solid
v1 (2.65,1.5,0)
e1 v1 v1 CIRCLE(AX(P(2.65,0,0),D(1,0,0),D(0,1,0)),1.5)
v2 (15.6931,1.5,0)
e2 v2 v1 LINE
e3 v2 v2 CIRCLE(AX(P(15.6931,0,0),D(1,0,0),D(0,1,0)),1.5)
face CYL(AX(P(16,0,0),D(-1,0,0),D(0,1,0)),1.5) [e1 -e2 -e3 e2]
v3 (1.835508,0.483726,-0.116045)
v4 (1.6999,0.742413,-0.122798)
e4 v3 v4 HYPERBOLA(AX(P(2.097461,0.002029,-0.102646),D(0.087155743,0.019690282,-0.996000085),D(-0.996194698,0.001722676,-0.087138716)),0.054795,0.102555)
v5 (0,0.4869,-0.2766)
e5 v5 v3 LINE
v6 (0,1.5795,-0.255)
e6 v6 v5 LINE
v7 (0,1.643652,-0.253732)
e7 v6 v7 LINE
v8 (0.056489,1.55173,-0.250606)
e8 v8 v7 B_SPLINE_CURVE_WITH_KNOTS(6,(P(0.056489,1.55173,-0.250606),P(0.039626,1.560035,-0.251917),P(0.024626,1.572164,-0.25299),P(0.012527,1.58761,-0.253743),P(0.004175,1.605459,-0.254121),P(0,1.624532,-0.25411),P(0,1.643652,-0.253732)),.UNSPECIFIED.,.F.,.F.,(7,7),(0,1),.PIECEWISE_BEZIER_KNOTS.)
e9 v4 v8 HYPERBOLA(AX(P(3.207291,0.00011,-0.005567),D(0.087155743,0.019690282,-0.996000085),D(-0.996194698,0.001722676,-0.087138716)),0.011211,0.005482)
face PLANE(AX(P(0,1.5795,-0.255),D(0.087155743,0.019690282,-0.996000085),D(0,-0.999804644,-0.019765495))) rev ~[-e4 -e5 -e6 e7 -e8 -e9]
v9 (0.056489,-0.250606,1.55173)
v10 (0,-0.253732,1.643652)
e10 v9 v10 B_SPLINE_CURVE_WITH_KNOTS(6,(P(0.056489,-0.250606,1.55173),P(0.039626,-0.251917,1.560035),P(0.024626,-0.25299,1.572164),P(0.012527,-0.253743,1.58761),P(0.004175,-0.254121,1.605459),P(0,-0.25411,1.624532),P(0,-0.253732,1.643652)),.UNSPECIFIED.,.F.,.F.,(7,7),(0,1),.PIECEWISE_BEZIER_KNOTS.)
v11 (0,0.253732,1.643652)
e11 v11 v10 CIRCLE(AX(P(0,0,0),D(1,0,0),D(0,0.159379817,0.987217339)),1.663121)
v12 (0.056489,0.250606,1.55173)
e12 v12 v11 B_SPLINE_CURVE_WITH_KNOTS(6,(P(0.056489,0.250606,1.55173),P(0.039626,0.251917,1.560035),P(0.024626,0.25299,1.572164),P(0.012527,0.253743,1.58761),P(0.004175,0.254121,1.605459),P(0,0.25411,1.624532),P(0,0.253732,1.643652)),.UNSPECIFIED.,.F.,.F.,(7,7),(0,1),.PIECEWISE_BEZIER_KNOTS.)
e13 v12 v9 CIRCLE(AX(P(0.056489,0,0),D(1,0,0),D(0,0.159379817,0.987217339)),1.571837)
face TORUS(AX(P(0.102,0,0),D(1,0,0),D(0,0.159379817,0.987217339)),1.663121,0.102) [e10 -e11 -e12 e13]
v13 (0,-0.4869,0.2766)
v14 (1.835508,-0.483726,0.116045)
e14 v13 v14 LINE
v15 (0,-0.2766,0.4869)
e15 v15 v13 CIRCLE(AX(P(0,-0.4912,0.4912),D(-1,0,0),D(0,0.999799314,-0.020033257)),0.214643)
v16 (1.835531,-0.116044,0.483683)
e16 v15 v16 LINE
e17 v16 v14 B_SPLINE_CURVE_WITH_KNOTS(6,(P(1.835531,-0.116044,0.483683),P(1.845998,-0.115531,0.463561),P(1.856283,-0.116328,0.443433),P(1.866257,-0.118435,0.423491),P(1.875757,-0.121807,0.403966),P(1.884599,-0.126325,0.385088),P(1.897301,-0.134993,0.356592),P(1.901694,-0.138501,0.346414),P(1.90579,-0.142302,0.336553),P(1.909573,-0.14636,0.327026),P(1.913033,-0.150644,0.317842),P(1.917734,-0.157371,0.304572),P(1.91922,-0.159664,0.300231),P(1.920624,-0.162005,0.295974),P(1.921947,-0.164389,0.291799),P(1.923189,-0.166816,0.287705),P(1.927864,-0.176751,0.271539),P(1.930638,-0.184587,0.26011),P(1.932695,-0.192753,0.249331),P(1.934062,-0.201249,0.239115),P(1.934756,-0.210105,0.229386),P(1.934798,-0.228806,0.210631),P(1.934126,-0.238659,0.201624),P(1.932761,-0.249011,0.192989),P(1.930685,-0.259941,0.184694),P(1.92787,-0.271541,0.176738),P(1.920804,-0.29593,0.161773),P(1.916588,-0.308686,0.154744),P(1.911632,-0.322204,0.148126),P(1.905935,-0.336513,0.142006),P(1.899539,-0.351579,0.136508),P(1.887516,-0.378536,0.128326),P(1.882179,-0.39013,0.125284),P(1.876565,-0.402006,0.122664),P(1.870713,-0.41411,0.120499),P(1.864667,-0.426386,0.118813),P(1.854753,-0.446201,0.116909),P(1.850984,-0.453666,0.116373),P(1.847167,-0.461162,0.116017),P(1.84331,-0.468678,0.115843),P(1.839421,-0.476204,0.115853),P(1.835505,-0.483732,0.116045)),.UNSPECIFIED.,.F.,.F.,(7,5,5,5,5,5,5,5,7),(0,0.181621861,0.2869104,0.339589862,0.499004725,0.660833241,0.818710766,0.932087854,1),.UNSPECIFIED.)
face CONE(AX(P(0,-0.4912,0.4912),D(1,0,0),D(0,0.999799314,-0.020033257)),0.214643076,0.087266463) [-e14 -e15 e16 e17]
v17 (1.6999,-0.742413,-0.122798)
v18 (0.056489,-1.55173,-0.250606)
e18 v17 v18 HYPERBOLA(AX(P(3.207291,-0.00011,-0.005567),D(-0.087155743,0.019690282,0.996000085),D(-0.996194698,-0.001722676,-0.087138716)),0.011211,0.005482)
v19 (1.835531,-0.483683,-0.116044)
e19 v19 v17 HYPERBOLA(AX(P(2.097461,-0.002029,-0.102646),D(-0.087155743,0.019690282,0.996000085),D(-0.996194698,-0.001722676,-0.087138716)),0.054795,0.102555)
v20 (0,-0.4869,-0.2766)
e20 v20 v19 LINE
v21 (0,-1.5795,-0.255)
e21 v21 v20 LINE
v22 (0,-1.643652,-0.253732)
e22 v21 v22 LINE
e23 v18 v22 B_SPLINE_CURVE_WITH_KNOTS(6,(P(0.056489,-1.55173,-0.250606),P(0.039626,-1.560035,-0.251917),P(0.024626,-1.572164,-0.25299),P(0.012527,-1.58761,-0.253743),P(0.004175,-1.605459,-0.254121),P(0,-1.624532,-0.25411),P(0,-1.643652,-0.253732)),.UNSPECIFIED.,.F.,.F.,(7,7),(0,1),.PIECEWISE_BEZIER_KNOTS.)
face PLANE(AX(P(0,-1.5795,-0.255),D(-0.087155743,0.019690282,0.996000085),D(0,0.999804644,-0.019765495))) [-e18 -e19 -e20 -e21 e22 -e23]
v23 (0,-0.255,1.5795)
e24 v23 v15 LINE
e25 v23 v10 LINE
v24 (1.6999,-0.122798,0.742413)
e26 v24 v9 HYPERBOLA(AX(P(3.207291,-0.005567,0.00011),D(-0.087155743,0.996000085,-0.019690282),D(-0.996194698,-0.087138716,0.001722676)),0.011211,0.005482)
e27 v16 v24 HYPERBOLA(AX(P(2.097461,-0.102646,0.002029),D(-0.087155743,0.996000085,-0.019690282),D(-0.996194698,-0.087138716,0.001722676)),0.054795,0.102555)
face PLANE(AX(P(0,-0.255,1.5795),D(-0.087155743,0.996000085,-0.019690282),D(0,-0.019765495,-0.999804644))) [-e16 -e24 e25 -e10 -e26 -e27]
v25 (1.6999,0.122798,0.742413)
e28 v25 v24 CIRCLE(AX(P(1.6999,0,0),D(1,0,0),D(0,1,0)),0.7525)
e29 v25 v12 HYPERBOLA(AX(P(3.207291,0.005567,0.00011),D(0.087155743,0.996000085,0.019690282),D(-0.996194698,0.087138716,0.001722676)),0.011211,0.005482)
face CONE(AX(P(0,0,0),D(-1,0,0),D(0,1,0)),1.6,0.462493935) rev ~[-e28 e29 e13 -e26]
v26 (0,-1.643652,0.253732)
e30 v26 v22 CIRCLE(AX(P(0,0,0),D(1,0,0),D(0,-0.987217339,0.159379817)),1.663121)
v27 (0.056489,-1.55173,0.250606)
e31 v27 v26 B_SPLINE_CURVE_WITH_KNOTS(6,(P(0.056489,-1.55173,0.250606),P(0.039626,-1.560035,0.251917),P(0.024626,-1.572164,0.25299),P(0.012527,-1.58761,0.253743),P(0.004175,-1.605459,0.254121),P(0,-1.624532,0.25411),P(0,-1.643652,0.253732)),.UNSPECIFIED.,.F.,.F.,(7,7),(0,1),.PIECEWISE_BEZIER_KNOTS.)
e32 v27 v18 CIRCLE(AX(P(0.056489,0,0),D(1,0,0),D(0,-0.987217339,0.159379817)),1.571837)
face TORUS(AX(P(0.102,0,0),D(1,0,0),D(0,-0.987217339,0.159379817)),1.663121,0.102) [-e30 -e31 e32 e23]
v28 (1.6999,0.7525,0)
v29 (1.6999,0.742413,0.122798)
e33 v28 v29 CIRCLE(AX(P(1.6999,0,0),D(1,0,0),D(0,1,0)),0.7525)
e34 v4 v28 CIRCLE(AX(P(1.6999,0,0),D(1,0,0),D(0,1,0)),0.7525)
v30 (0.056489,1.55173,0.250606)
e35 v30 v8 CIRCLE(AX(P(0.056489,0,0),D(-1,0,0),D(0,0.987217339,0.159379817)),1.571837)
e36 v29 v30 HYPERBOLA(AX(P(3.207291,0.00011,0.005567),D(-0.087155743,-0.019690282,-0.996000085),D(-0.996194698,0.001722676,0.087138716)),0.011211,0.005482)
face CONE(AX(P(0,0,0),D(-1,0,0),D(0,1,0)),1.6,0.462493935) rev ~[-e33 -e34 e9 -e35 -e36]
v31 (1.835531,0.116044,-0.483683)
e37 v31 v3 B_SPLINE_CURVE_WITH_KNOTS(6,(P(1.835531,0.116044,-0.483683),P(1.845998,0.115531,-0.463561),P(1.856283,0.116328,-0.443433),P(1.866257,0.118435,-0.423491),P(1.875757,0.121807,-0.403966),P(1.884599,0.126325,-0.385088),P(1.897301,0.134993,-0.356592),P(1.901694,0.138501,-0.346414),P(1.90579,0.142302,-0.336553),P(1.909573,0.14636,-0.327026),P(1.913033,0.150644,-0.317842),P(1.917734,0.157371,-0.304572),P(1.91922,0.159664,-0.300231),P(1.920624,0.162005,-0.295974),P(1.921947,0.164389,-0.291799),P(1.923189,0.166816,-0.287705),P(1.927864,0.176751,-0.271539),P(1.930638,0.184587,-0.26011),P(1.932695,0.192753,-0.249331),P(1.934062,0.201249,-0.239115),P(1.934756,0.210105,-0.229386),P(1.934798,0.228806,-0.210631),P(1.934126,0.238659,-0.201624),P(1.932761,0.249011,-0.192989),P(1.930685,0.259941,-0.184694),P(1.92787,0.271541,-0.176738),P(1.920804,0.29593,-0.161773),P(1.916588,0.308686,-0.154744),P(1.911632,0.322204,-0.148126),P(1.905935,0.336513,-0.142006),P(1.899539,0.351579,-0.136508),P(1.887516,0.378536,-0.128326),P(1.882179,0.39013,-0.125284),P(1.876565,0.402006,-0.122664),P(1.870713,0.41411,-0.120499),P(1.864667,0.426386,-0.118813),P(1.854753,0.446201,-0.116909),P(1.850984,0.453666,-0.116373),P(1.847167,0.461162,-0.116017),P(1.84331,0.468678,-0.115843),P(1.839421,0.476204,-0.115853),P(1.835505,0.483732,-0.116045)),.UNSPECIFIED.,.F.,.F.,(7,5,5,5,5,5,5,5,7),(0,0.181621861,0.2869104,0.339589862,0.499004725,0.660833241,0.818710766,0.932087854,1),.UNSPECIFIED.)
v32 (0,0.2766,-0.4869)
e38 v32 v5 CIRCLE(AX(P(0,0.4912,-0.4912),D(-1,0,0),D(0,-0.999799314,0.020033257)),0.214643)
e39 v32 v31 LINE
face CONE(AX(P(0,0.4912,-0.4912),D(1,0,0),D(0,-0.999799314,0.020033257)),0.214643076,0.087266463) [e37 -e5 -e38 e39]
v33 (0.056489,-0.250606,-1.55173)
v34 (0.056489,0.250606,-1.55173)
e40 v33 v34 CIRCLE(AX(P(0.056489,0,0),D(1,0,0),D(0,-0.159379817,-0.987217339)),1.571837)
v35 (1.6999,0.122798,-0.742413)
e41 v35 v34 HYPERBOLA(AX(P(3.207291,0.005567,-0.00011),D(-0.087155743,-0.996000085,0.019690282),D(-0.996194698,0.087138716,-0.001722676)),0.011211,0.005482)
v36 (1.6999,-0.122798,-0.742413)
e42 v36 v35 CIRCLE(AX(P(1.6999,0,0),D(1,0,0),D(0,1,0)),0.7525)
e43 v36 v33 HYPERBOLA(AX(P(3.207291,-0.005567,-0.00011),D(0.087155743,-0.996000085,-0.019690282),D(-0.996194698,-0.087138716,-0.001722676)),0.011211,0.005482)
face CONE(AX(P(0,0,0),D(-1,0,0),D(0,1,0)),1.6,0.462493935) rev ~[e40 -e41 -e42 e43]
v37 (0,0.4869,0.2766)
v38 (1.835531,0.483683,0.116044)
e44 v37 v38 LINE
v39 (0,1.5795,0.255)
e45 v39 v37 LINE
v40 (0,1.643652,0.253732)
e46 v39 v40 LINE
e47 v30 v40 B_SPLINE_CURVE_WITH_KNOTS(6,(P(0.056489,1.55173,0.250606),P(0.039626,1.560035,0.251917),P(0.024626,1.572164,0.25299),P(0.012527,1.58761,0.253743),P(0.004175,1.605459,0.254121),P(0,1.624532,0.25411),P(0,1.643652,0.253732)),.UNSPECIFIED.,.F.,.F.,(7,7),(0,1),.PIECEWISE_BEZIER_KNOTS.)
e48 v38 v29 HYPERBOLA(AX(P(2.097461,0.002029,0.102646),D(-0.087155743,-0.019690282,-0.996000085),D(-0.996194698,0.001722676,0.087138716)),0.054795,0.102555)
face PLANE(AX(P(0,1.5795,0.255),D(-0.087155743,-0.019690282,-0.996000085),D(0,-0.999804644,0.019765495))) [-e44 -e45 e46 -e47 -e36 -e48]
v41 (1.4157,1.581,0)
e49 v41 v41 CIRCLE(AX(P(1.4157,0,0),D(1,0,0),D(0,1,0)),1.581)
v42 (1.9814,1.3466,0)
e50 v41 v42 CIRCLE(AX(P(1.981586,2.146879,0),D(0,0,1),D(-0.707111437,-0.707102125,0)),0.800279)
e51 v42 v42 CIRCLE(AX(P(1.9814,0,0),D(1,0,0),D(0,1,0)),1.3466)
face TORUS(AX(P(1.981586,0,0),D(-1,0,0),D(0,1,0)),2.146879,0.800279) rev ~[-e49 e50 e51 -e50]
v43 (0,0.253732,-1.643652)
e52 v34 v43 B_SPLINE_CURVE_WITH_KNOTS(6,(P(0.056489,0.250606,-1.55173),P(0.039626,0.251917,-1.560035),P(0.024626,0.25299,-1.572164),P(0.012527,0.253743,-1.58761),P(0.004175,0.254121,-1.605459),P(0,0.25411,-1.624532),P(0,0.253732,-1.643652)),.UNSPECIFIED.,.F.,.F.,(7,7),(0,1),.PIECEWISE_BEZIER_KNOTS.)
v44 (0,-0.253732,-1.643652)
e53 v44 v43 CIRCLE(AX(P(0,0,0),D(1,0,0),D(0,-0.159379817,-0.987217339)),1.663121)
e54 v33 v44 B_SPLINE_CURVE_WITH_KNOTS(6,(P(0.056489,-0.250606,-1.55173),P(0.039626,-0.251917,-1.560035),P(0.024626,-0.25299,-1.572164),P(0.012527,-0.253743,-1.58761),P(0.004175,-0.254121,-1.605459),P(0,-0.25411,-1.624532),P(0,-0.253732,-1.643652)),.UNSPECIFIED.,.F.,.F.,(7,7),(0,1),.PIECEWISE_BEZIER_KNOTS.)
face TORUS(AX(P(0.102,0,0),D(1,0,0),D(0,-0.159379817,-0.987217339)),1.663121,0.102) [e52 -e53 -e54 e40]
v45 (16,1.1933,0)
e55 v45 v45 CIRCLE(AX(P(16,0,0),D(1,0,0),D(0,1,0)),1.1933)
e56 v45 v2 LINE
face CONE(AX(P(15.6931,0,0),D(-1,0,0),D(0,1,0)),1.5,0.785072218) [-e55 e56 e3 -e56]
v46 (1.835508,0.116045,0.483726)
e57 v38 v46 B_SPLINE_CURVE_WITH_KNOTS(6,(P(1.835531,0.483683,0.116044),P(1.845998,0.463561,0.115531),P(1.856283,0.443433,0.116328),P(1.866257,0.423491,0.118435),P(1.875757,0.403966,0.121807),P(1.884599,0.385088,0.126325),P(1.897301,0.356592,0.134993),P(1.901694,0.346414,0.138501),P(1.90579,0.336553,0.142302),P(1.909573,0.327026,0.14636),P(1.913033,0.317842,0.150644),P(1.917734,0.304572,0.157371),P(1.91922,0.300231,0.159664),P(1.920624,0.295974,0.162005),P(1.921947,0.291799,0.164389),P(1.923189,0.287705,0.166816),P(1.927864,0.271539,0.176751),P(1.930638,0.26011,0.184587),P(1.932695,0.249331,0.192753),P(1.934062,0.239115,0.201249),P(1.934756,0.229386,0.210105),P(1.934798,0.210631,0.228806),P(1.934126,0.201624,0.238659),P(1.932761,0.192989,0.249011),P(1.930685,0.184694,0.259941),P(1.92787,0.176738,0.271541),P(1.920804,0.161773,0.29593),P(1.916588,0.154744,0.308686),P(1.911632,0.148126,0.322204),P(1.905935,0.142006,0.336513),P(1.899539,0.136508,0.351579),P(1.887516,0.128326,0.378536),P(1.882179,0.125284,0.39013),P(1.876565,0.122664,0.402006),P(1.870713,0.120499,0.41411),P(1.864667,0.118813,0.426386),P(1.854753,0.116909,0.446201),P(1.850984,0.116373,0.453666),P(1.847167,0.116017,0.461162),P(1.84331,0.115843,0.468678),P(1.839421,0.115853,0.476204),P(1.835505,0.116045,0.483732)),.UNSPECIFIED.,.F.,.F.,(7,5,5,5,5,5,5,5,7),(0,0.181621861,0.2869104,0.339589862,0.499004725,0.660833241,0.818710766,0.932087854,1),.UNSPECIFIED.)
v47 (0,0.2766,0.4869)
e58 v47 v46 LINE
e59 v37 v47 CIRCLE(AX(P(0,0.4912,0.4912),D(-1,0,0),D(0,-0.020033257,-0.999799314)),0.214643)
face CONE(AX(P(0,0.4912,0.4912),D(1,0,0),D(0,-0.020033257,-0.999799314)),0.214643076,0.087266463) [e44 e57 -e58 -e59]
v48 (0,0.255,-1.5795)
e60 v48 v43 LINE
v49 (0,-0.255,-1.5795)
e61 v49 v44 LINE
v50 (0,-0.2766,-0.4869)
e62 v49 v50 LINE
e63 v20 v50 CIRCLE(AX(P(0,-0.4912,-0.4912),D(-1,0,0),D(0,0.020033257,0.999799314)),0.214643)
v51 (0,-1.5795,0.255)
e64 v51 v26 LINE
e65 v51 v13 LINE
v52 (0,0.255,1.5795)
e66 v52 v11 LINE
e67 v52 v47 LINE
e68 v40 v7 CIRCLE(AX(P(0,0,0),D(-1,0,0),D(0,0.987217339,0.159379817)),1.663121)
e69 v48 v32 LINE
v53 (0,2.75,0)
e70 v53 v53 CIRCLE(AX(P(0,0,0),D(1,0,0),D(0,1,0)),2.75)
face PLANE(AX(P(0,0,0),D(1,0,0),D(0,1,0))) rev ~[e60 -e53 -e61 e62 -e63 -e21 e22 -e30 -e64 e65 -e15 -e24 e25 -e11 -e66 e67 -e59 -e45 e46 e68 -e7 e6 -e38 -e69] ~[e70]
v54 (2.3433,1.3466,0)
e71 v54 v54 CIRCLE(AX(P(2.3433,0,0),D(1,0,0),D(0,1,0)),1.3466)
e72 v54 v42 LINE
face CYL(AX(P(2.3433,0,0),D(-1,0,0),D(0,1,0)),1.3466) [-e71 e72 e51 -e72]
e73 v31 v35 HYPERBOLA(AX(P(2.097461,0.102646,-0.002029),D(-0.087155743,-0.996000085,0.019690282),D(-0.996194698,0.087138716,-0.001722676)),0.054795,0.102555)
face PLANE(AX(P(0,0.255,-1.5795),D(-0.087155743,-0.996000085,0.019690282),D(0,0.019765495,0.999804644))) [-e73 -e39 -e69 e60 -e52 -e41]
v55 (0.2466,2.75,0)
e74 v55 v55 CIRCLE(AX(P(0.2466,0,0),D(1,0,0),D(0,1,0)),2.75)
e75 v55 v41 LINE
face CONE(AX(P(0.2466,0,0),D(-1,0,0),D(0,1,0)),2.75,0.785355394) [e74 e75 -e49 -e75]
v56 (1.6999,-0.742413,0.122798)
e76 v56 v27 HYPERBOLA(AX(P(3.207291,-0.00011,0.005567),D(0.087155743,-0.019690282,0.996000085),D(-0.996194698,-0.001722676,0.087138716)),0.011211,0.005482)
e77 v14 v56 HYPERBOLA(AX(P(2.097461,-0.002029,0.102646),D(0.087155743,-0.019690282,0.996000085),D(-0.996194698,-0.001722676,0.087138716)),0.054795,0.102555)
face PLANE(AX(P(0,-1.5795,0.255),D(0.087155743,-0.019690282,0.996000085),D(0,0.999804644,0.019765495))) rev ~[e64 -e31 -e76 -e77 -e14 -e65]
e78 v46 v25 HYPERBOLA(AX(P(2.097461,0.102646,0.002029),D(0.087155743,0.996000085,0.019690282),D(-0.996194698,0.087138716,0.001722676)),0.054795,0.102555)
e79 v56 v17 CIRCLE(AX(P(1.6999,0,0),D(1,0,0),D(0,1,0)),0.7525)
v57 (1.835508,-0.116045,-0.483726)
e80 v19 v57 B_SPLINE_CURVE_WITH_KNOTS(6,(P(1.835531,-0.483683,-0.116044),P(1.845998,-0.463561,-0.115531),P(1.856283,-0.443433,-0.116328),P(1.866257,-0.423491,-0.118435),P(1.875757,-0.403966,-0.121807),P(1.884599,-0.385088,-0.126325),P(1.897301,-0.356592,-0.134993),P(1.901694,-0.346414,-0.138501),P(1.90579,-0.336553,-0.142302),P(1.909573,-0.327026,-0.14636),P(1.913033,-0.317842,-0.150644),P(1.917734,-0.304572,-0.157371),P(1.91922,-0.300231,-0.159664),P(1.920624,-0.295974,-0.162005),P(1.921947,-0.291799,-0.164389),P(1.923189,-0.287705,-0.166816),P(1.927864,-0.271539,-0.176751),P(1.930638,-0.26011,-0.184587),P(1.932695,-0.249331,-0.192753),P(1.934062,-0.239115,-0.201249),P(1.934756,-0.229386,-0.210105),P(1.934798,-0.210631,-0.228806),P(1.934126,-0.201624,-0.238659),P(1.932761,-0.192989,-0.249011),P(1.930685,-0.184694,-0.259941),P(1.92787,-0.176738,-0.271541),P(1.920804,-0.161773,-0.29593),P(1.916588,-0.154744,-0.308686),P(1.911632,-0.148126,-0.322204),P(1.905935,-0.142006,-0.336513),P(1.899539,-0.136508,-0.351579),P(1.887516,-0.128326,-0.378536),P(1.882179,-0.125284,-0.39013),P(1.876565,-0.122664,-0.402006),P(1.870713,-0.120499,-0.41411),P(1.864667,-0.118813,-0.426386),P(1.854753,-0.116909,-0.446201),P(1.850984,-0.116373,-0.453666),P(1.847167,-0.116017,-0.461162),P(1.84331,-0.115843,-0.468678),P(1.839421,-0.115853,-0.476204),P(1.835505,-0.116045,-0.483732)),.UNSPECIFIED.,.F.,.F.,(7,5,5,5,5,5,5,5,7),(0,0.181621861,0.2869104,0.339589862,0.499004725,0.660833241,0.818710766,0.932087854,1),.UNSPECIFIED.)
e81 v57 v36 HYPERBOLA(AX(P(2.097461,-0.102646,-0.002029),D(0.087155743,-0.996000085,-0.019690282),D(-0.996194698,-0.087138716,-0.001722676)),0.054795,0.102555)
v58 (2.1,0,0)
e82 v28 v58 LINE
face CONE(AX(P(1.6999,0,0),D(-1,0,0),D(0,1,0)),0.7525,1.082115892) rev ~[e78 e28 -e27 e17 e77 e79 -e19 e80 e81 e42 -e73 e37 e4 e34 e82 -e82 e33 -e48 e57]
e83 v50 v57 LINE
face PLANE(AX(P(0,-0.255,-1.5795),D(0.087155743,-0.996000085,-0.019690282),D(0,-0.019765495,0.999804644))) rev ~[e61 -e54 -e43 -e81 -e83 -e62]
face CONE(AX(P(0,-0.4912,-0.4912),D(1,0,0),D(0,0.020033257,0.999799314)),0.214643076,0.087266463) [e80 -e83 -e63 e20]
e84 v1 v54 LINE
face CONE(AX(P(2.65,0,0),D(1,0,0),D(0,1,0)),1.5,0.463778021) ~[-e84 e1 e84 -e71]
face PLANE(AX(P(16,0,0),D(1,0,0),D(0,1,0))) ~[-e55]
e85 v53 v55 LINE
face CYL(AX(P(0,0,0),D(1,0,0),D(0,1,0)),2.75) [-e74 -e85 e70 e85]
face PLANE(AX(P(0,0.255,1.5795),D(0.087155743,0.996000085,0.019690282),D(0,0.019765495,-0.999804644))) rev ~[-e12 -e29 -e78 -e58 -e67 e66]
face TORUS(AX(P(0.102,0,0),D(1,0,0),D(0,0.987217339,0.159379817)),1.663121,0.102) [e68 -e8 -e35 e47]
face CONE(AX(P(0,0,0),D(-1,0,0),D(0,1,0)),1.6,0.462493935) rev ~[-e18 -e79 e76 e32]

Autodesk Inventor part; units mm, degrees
ref_plane "YZ Plane" through (0, 0, 0) normal (1, 0, 0) x (0, 1, 0)
ref_plane "XZ Plane" through (0, 0, 0) normal (0, 1, 0) x (-1, 0, 0)
sketch "Sketch1" plane through (0, 0, 0) normal (0, 0, 1) x (1, 0, 0)
  line L0 (2.1, 0) -> (16, 0)
  line L1 (16, 0) -> (16, 1.5)
  line L2 (16, 1.5) -> (2.65, 1.5)
  line L3 (2.65, 1.5) -> (2.3433, 1.3466)
  line L4 (2.3433, 1.3466) -> (1.9814, 1.3466)
  line L5 (0, 2.75) -> (0, 1.6)
  line L6 (0, 1.6) -> (1.6999, 0.7525)
  line L7 (1.6999, 0.7525) -> (2.1, 0)
  line L8 (-3.2, 0) -> (19.2, 0) projected
  line L9 (0, -0.55) -> (0, 3.3) projected
  line L10 (0, 2.75) -> (0.2466, 2.75)
  line L11 (0.2466, 2.75) -> (1.4157, 1.581)
  line L12 (2.65, 1.5) -> (1.4966, 1.5) construction
  arc A0 (1.4157, 1.581) -> (1.9814, 1.3466) centre (1.9814, 2.1466) ccw
  point P0 (1.65, 1.3466)
  dimension "d1" = 13.35
  dimension "d2" = 3
  dimension "d3" = 2.6933
  dimension "d4" = 3.2
  dimension "d5" = 26.5
  dimension "d6" = 62
  dimension "d7" = 2.1
  dimension "d8" = 0.3067
  dimension "d12" = 5.5
  dimension "d13" = 45
  dimension "d15" = 16
  dimension "d24" = 1.65
  dimension "d93" = 0.8
revolve "Body" add sketch "Sketch1" angle 360 about axis through (2.1, 0, 0) along (1, 0, 0) contours L7 L6 L5 L10 L11 A0 L4 L3 L2 L1 L0
sketch "Sketch2" plane through (0, 0, 0) normal (-1, 0, 0) x (0, 0, 1)
  line L0 (0, 1.6) -> (0, 0) construction
  line L1 (0, 0) -> (1.6, 0) construction
  arc A0 (0.48, 0) -> (0, 0.48) centre (0, 0) ccw construction
  arc A1 (0.56, 0) -> (0, 0.56) centre (0, 0) ccw construction
  arc A2 (1.5795, 0.255) -> (0.255, 1.5795) centre (0, 0) ccw
  line L2 (0, 0) -> (1.1314, 1.1314) construction
  line L3 (0.255, 1.5795) -> (0.2766, 0.4869)
  line L4 (1.5795, 0.255) -> (0.4869, 0.2766)
  arc A3 (0.255, 1.5795) -> (0, 1.6) centre (0, 0) ccw
  arc A4 (1.6, 0) -> (1.5795, 0.255) centre (0, 0) ccw
  line L5 (0, -3.85) -> (0, 3.85) projected
  line L6 (-3.85, 0) -> (3.85, 0) projected
  arc A5 (0.255, -1.5795) -> (1.5795, -0.255) centre (0, 0) ccw
  line L7 (0.255, -1.5795) -> (0.2766, -0.4869)
  line L8 (1.5795, -0.255) -> (0.4869, -0.2766)
  arc A6 (0, -1.6) -> (0.255, -1.5795) centre (0, 0) ccw
  arc A7 (1.5795, -0.255) -> (1.6, 0) centre (0, 0) ccw
  arc A8 (-0.255, 1.5795) -> (-1.5795, 0.255) centre (0, 0) ccw
  line L9 (-0.255, 1.5795) -> (-0.2766, 0.4869)
  line L10 (-1.5795, 0.255) -> (-0.4869, 0.2766)
  arc A9 (0, 1.6) -> (-0.255, 1.5795) centre (0, 0) ccw
  arc A10 (-1.5795, 0.255) -> (-1.6, 0) centre (0, 0) ccw
  arc A11 (-0.255, -1.5795) -> (0, -1.6) centre (0, 0) ccw
  arc A12 (-1.5795, -0.255) -> (-0.255, -1.5795) centre (0, 0) ccw
  arc A13 (-1.6, 0) -> (-1.5795, -0.255) centre (0, 0) ccw
  line L11 (-1.5795, -0.255) -> (-0.4869, -0.2766)
  line L12 (-0.255, -1.5795) -> (-0.2766, -0.4869)
  arc A14 (0.2766, 0.4869) -> (0.4869, 0.2766) centre (0.4912, 0.4912) ccw
  arc A15 (0.4869, -0.2766) -> (0.2766, -0.4869) centre (0.4912, -0.4912) ccw
  arc A16 (-0.4869, 0.2766) -> (-0.2766, 0.4869) centre (-0.4912, 0.4912) ccw
  arc A17 (-0.2766, -0.4869) -> (-0.4869, -0.2766) centre (-0.4912, -0.4912) ccw
  point P0 (1.1314, -1.1314)
  point P1 (-1.1314, 1.1314)
  point P2 (-1.1314, -1.1314)
  dimension "d17" = 0.96
  dimension "d18" = 1.12
  dimension "d19" = 3.2
  dimension "d20" = 45
  dimension "d21" = 0.255
extrude "Slot" add sketch "Sketch2" against normal up to next draft 5 contours L4 A14 L3 A2 | A5 L7 A15 L8 | L9 A16 L10 A8 | A12 L11 A17 L12
fillet "Fillet1" radius 0.102 4 edges at (0, 1.6, 0) (0, 0, -1.6) (0, -1.6, 0) (0, 0, 1.6)
thread "Thread" size "M3x0.5" class "6g" standard "ISO Metric profile" length 13.35
chamfer "Chamfer1" distance 0.3067 distance2 0.3069 1 edges at (16, -1.5, 0) measured on face at (16, -0.5495, 0.6466)
ref_plane "Work Plane2" through (3.35, 0, 0) normal (0, 0, -1) x (1, 0, 0)
equation "\"d24\" = KOH"
equation "\"d17\" = 0.3 * SDM"
equation "\"d18\" = 0.35 * SDM"
equation "\"d19\" = SDM"
equation "\"d21\" = 0.5 * SBR"
equation "\"d1\" = GEL"
equation "\"d2\" = GD"
equation "\"d3\" = BDM"
equation "\"d4\" = SDM"
equation "\"d7\" = INTI"
equation "\"d8\" = GAL"
equation "\"d12\" = KOD"
equation "\"d13\" = 0.5 * SEWI"
equation "\"d15\" = NLG"
equation "\"d93\" = R"
equation "\"d23\" = 0.2 * SBR"
equation "\"d10\" = GEL"
equation "\"d25\" = -0.5 * SPD + 0.5 * GD"
equation "\"NLG\" = 16"
equation "\"GEL\" = 13.35"
equation "\"GAL\" = 0.61345 * PTC"
equation "\"SPD\" = NND - 1.2269 * PTC"
equation "\"KOD\" = 5.5"
equation "\"KOH\" = 1.65"
equation "\"SBR\" = 0.51"
equation "\"INTI\" = 2.1"
equation "\"SDM\" = 3.2"
equation "\"GD\" = NND"
equation "\"BDM\" = NND - GAL"
equation "\"SEWI\" = 90deg"
equation "\"d9\" = SDM"
equation "\"R\" = 0.8"
equation "\"GUL\" = 0.61345 * PTC"
equation "\"TOA\" = 30deg"
equation "\"EPV\" = 3.15"
equation "\"THREADDIA\" = 3"
equation "\"PTC\" = 0.5"
equation "\"NND\" = 3"
equation "\"GD1\" = THREADDIA - 1.2269 * PTC"
properties part number "ISO 7046-1  - M3 x 16 - 4.8 - H" material "Steel"
